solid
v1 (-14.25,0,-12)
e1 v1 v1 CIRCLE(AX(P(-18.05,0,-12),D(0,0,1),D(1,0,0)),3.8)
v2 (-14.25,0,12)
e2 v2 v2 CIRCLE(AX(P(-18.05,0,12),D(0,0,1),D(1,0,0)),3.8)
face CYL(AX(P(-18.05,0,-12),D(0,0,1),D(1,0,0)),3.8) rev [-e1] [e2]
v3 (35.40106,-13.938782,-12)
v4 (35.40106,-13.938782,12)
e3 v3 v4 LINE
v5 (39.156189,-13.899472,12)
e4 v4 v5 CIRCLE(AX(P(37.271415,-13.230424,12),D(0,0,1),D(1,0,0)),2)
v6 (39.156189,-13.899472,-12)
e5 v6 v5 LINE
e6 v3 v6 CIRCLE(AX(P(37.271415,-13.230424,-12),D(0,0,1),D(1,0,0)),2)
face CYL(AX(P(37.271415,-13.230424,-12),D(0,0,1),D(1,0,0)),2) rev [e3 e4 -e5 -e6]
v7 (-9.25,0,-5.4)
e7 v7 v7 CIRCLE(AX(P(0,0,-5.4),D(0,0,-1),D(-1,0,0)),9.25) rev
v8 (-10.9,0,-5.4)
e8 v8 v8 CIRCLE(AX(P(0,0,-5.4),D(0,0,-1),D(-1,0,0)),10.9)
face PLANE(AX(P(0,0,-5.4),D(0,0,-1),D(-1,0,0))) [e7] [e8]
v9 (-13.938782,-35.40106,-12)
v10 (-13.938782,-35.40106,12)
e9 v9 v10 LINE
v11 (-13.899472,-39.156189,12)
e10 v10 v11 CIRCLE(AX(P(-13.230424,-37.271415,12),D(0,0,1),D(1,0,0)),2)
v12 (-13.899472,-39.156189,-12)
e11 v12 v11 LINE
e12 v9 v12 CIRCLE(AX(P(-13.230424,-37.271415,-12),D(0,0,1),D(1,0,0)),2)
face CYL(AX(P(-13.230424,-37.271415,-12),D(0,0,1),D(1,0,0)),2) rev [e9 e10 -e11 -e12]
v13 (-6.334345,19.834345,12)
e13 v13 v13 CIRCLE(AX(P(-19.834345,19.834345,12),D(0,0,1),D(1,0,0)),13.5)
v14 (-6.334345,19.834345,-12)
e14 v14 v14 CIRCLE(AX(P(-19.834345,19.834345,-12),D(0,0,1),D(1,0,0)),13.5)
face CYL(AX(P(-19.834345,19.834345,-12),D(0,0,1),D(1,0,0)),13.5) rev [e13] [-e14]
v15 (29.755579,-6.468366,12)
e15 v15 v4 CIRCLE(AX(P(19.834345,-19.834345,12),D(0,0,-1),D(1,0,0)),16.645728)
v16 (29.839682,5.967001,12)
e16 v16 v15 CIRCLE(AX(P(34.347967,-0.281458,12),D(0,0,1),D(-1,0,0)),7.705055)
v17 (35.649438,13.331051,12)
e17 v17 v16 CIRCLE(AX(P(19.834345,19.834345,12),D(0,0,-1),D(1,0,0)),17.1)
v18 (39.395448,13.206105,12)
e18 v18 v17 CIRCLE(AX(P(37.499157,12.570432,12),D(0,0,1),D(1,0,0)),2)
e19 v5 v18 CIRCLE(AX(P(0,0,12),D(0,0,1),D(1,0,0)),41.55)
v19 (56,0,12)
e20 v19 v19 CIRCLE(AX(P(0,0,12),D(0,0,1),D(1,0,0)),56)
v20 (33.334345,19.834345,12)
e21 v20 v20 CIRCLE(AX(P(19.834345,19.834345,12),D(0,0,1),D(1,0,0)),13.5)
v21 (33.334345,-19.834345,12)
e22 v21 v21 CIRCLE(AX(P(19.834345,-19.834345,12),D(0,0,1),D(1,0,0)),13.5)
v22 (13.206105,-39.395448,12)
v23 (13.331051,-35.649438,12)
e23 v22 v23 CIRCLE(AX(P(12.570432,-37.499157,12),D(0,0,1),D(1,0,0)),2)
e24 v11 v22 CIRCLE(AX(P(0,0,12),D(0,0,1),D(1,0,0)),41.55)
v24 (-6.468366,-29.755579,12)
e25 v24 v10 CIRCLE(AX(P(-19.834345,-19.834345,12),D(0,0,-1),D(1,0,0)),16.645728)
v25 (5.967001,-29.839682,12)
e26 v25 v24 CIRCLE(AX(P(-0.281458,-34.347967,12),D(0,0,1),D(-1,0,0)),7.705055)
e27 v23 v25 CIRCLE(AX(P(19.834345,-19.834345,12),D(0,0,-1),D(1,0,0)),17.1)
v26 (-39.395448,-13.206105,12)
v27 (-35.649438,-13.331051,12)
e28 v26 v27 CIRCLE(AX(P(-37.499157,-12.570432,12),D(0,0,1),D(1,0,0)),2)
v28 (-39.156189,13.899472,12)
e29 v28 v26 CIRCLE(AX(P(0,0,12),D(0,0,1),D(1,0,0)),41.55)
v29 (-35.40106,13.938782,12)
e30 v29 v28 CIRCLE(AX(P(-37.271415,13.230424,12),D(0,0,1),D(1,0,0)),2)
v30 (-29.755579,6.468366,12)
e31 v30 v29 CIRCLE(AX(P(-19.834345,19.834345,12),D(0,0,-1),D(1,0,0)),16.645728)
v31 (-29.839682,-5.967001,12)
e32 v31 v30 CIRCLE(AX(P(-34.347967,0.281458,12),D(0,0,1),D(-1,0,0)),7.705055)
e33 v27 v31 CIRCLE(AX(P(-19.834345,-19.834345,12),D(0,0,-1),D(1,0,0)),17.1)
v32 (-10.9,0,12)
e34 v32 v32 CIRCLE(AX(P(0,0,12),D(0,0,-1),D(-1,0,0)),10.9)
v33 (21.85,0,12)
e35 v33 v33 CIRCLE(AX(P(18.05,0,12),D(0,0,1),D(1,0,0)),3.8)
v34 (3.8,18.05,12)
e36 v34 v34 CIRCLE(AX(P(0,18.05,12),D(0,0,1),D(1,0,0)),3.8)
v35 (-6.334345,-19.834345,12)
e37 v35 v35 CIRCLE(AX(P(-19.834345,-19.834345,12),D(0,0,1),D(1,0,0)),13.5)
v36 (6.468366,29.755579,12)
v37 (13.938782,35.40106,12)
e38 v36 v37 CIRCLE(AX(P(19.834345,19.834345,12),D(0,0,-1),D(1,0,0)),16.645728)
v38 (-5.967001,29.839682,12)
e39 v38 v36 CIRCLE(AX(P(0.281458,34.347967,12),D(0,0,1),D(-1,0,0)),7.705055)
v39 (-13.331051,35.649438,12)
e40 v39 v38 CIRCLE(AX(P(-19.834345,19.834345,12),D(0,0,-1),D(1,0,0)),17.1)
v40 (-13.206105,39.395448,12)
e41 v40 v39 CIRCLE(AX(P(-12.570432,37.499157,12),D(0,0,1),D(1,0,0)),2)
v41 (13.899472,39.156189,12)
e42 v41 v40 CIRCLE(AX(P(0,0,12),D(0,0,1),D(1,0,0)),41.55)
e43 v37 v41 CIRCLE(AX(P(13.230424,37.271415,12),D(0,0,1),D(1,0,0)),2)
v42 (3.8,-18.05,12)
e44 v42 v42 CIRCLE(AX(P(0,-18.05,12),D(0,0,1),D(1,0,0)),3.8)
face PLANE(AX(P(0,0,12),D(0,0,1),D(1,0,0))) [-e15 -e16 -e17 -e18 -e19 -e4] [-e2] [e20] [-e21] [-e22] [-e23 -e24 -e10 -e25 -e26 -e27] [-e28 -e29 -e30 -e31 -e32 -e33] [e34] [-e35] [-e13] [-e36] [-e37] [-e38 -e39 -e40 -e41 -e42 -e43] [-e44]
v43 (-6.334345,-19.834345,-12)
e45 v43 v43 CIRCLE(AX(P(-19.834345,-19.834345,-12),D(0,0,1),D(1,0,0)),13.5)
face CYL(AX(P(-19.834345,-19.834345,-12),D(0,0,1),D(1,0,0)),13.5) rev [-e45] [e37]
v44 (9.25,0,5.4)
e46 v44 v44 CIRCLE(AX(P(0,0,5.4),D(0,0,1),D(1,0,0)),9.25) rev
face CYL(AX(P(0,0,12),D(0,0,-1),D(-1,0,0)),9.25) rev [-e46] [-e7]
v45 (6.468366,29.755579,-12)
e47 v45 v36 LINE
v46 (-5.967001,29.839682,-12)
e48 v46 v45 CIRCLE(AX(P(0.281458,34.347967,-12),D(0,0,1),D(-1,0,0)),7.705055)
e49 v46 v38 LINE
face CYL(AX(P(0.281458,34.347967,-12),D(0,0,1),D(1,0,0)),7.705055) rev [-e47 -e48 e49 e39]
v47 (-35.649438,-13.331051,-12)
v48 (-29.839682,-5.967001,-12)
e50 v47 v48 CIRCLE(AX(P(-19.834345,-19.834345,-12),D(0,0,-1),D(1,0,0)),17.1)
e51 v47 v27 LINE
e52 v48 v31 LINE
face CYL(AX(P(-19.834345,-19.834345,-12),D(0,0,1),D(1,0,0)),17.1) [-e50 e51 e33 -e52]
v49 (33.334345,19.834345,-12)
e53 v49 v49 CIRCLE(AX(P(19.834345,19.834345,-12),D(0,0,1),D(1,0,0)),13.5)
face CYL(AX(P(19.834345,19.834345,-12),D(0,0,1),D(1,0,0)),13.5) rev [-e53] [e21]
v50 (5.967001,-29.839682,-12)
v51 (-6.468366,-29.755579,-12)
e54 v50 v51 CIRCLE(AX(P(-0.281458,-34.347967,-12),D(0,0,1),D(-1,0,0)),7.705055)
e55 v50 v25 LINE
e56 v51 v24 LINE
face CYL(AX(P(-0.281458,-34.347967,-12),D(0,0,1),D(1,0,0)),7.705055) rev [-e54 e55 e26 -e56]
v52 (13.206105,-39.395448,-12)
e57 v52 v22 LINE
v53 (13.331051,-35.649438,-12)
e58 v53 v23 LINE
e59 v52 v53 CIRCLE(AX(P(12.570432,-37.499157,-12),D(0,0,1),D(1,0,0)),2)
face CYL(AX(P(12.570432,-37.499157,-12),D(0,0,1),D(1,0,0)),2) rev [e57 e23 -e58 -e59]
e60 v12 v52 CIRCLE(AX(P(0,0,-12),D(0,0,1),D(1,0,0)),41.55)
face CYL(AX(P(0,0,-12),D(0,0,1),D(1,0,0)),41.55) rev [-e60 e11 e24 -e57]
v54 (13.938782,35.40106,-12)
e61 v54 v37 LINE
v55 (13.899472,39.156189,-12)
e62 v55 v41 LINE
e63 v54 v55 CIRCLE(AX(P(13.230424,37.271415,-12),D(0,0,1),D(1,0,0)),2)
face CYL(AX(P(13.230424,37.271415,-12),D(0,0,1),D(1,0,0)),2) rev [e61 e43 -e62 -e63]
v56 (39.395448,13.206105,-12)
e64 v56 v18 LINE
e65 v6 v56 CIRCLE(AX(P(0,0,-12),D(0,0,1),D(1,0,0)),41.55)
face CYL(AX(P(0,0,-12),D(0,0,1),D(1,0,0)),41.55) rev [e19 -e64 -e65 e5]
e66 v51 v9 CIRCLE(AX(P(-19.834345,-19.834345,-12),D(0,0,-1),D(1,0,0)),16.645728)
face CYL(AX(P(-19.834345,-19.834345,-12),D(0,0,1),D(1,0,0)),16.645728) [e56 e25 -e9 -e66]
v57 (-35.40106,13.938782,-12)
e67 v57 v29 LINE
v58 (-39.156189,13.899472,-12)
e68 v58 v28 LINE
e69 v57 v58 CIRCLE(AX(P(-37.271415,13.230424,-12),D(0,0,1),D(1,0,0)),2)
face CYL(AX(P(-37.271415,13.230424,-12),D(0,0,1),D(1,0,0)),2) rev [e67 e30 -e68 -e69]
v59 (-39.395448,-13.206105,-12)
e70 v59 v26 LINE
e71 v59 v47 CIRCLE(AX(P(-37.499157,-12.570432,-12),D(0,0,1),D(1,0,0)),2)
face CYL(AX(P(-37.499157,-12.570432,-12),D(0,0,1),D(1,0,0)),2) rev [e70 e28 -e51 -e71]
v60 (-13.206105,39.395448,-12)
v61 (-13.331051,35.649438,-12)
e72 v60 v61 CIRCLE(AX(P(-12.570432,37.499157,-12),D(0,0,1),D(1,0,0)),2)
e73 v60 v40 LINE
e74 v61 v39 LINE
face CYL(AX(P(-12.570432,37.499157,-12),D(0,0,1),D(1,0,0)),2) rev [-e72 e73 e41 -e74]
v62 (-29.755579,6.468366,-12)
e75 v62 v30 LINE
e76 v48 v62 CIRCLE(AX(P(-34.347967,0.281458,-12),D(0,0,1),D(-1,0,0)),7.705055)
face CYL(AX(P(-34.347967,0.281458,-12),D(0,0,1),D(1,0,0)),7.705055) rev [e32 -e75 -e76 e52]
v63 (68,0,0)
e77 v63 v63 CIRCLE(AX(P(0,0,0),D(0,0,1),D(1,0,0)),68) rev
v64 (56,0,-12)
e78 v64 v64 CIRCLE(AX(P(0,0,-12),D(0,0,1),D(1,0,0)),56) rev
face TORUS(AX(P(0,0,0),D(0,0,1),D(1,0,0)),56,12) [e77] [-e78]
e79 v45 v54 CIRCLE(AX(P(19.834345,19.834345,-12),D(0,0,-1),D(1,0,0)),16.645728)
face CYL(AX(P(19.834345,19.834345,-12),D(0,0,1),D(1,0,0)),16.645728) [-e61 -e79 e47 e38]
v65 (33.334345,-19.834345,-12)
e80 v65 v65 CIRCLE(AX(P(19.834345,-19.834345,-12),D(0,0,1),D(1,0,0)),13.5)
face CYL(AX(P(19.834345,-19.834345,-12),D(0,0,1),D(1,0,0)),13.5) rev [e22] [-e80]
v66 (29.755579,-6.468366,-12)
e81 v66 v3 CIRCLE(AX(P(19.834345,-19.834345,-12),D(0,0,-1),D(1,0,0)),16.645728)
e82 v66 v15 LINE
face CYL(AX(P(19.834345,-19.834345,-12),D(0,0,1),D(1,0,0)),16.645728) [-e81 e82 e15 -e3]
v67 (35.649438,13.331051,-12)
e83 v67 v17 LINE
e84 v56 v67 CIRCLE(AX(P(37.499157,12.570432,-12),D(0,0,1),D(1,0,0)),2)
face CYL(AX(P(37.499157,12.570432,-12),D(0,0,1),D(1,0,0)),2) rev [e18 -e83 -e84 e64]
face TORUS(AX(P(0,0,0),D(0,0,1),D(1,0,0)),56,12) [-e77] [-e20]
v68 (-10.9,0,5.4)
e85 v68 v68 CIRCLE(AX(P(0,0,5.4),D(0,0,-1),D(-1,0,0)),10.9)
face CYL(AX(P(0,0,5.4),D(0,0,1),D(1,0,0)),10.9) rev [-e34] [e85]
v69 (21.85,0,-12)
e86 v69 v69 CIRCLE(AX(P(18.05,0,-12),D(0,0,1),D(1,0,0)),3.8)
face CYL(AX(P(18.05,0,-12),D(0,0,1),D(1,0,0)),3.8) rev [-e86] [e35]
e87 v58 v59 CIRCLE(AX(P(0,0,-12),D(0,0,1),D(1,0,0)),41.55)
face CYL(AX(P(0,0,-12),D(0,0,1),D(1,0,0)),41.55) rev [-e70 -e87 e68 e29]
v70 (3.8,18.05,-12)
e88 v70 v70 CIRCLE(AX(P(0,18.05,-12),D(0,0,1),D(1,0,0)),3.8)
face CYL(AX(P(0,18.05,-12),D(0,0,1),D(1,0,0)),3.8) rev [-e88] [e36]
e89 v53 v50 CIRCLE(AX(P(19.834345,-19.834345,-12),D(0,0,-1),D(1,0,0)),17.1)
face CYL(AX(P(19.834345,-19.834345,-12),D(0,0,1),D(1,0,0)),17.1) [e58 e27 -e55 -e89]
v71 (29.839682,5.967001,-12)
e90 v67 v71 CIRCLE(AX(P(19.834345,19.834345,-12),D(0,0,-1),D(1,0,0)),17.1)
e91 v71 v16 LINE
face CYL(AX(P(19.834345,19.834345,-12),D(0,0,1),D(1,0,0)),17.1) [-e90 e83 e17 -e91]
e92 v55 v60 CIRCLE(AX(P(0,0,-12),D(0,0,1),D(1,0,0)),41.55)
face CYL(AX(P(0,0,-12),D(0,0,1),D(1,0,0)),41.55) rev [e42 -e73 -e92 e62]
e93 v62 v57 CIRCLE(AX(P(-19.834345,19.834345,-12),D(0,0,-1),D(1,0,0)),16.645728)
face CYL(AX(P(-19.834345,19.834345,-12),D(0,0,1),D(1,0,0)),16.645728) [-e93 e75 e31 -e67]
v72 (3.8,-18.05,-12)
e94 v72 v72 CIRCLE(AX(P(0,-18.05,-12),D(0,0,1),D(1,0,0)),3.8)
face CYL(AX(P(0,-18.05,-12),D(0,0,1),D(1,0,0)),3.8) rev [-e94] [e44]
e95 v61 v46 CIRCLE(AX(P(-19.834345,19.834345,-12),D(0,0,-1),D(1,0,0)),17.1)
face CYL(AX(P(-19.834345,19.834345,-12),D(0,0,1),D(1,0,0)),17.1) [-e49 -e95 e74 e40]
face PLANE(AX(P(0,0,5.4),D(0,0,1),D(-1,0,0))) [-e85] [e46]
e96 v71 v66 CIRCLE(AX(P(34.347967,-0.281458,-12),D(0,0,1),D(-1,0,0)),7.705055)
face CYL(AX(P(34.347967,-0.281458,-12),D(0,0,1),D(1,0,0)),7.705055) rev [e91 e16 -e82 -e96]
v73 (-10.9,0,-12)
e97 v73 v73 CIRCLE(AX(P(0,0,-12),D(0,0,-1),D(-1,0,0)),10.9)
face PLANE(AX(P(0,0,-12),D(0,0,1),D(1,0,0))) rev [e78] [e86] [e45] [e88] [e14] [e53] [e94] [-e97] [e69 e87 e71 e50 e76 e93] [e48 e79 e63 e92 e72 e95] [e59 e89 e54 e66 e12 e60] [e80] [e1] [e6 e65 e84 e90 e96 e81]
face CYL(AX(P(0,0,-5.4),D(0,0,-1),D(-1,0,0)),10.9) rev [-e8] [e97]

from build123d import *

# Parameters (mm, degrees)
EXTRUDE_2_DEPTH      = 12
EXTRUDE_2_DEPTH_BACK = 12
SKETCH_1_R           = 68
FILLET_1_R           = 12
SKETCH_2_R           = 9.25
CUT_EXTRUDE_1_DEPTH  = 100.116093684
SKETCH_3_R           = 10.9
CUT_EXTRUDE_2_DEPTH  = 6.6
SKETCH_4_R           = 3.8
SKETCH_4_R_2         = 13.5
CUT_EXTRUDE_3_DEPTH  = 100.116093684
SKETCH_5_R           = 13.5
SKETCH_5_R_2         = 3.8
CUT_EXTRUDE_4_DEPTH  = 100.116093684


with BuildPart() as part:
    # 草图1 → 凸台-拉伸2 (new, two sides: drawn at the far end of the back side and taken through both)
    with BuildSketch(Plane.XY.offset(-EXTRUDE_2_DEPTH_BACK)):
        Circle(SKETCH_1_R)
    extrude(amount=EXTRUDE_2_DEPTH + EXTRUDE_2_DEPTH_BACK)

    # 圆角1
    fillet_1_edges = [part.edges().sort_by_distance(p)[0] for p in [
        (-68, 0, -12),
        (-68, 0, 12),
    ]]
    fillet(fillet_1_edges, radius=FILLET_1_R - 0.0001)  # a hair under: the kernel refuses the full size

    # 草图2 → 切除-拉伸1 (cut, through all)
    with BuildSketch(Plane(origin=(0, 0, -12), x_dir=(-1, 0, 0), z_dir=(0, 0, -1))):
        Circle(SKETCH_2_R)
    extrude(amount=-CUT_EXTRUDE_1_DEPTH, mode=Mode.SUBTRACT)

    # 草图3 → 切除-拉伸2 (cut)
    with BuildSketch(Plane(origin=(0, 0, -12), x_dir=(-1, 0, 0), z_dir=(0, 0, -1))):
        Circle(SKETCH_3_R)
    cut_extrude_2 = extrude(amount=-CUT_EXTRUDE_2_DEPTH, mode=Mode.SUBTRACT)

    # 镜向1: 切除-拉伸2 across plane
    add(cut_extrude_2.mirror(Plane.XY), mode=Mode.SUBTRACT)

    # 草图4 → 切除-拉伸3 (cut, through all)
    with BuildSketch(Plane.XY.offset(12)):
        with Locations((-18.05, 0)):
            Circle(SKETCH_4_R)
        with Locations((0, 18.05)):
            Circle(SKETCH_4_R)
        with Locations((18.05, 0)):
            Circle(SKETCH_4_R)
        with Locations((0, -18.05)):
            Circle(SKETCH_4_R)
        with Locations((-19.834345212, 19.834345212)):
            Circle(SKETCH_4_R_2)
        with Locations((19.834345212, 19.834345212)):
            Circle(SKETCH_4_R_2)
        with Locations((19.834345212, -19.834345212)):
            Circle(SKETCH_4_R_2)
        with Locations((-19.834345212, -19.834345212)):
            Circle(SKETCH_4_R_2)
    extrude(amount=-CUT_EXTRUDE_3_DEPTH, mode=Mode.SUBTRACT)

    # 草图5 → 切除-拉伸4 (cut, through all)
    with BuildSketch(Plane.XY.offset(12)):
        with Locations((-19.834345212, 19.834345212)):
            Circle(SKETCH_5_R)
        with Locations((-19.834345212, -19.834345212)):
            Circle(SKETCH_5_R)
        with Locations((-18.05, 0)):
            Circle(SKETCH_5_R_2)
        with BuildLine():
            ThreePointArc((-39.156189478, 13.899472133), (-41.548381428, 0.366743421), (-39.395447702, -13.206104662))
            ThreePointArc((-39.395447702, -13.206104662), (-37.565828535, -14.569320158), (-35.649438128, -13.331050964))
            ThreePointArc((-35.649438128, -13.331050964), (-33.259357653, -9.242884455), (-29.839682343, -5.967001238))
            ThreePointArc((-29.839682343, -5.967001238), (-26.643088536, 0.229347635), (-29.755578801, 6.468366442))
            ThreePointArc((-29.755578801, 6.468366442), (-33.114429859, 9.798428902), (-35.401059543, 13.938781679))
            ThreePointArc((-35.401059543, 13.938781679), (-37.292350318, 15.230314561), (-39.156189478, 13.899472133))
        make_face()
        with BuildLine():
            ThreePointArc((6.468366442, 29.755578801), (0.229347635, 26.643088536), (-5.967001238, 29.839682343))
            ThreePointArc((-5.967001238, 29.839682343), (-9.242884455, 33.259357653), (-13.331050964, 35.649438128))
            ThreePointArc((-13.331050964, 35.649438128), (-14.569320158, 37.565828535), (-13.206104662, 39.395447702))
            ThreePointArc((-13.206104662, 39.395447702), (0.366743421, 41.548381428), (13.899472133, 39.156189478))
            ThreePointArc((13.899472133, 39.156189478), (15.230314561, 37.292350318), (13.938781679, 35.401059543))
            ThreePointArc((13.938781679, 35.401059543), (9.798428902, 33.114429859), (6.468366442, 29.755578801))
        make_face()
        with BuildLine():
            ThreePointArc((29.755578801, -6.468366442), (26.643088536, -0.229347635), (29.839682343, 5.967001238))
            ThreePointArc((29.839682343, 5.967001238), (33.259357653, 9.242884455), (35.649438128, 13.331050964))
            ThreePointArc((35.649438128, 13.331050964), (37.565828535, 14.569320158), (39.395447702, 13.206104662))
            ThreePointArc((39.395447702, 13.206104662), (41.548381428, -0.366743421), (39.156189478, -13.899472133))
            ThreePointArc((39.156189478, -13.899472133), (37.292350318, -15.230314561), (35.401059543, -13.938781679))
            ThreePointArc((35.401059543, -13.938781679), (33.114429859, -9.798428902), (29.755578801, -6.468366442))
        make_face()
        with BuildLine():
            ThreePointArc((-6.468366442, -29.755578801), (-0.229347635, -26.643088536), (5.967001238, -29.839682343))
            ThreePointArc((5.967001238, -29.839682343), (9.242884455, -33.259357653), (13.331050964, -35.649438128))
            ThreePointArc((13.331050964, -35.649438128), (14.569320158, -37.565828535), (13.206104662, -39.395447702))
            ThreePointArc((13.206104662, -39.395447702), (-0.366743421, -41.548381428), (-13.899472133, -39.156189478))
            ThreePointArc((-13.899472133, -39.156189478), (-15.230314561, -37.292350318), (-13.938781679, -35.401059543))
            ThreePointArc((-13.938781679, -35.401059543), (-9.798428902, -33.114429859), (-6.468366442, -29.755578801))
        make_face()
    extrude(amount=-CUT_EXTRUDE_4_DEPTH, mode=Mode.SUBTRACT)


solid = part.part
